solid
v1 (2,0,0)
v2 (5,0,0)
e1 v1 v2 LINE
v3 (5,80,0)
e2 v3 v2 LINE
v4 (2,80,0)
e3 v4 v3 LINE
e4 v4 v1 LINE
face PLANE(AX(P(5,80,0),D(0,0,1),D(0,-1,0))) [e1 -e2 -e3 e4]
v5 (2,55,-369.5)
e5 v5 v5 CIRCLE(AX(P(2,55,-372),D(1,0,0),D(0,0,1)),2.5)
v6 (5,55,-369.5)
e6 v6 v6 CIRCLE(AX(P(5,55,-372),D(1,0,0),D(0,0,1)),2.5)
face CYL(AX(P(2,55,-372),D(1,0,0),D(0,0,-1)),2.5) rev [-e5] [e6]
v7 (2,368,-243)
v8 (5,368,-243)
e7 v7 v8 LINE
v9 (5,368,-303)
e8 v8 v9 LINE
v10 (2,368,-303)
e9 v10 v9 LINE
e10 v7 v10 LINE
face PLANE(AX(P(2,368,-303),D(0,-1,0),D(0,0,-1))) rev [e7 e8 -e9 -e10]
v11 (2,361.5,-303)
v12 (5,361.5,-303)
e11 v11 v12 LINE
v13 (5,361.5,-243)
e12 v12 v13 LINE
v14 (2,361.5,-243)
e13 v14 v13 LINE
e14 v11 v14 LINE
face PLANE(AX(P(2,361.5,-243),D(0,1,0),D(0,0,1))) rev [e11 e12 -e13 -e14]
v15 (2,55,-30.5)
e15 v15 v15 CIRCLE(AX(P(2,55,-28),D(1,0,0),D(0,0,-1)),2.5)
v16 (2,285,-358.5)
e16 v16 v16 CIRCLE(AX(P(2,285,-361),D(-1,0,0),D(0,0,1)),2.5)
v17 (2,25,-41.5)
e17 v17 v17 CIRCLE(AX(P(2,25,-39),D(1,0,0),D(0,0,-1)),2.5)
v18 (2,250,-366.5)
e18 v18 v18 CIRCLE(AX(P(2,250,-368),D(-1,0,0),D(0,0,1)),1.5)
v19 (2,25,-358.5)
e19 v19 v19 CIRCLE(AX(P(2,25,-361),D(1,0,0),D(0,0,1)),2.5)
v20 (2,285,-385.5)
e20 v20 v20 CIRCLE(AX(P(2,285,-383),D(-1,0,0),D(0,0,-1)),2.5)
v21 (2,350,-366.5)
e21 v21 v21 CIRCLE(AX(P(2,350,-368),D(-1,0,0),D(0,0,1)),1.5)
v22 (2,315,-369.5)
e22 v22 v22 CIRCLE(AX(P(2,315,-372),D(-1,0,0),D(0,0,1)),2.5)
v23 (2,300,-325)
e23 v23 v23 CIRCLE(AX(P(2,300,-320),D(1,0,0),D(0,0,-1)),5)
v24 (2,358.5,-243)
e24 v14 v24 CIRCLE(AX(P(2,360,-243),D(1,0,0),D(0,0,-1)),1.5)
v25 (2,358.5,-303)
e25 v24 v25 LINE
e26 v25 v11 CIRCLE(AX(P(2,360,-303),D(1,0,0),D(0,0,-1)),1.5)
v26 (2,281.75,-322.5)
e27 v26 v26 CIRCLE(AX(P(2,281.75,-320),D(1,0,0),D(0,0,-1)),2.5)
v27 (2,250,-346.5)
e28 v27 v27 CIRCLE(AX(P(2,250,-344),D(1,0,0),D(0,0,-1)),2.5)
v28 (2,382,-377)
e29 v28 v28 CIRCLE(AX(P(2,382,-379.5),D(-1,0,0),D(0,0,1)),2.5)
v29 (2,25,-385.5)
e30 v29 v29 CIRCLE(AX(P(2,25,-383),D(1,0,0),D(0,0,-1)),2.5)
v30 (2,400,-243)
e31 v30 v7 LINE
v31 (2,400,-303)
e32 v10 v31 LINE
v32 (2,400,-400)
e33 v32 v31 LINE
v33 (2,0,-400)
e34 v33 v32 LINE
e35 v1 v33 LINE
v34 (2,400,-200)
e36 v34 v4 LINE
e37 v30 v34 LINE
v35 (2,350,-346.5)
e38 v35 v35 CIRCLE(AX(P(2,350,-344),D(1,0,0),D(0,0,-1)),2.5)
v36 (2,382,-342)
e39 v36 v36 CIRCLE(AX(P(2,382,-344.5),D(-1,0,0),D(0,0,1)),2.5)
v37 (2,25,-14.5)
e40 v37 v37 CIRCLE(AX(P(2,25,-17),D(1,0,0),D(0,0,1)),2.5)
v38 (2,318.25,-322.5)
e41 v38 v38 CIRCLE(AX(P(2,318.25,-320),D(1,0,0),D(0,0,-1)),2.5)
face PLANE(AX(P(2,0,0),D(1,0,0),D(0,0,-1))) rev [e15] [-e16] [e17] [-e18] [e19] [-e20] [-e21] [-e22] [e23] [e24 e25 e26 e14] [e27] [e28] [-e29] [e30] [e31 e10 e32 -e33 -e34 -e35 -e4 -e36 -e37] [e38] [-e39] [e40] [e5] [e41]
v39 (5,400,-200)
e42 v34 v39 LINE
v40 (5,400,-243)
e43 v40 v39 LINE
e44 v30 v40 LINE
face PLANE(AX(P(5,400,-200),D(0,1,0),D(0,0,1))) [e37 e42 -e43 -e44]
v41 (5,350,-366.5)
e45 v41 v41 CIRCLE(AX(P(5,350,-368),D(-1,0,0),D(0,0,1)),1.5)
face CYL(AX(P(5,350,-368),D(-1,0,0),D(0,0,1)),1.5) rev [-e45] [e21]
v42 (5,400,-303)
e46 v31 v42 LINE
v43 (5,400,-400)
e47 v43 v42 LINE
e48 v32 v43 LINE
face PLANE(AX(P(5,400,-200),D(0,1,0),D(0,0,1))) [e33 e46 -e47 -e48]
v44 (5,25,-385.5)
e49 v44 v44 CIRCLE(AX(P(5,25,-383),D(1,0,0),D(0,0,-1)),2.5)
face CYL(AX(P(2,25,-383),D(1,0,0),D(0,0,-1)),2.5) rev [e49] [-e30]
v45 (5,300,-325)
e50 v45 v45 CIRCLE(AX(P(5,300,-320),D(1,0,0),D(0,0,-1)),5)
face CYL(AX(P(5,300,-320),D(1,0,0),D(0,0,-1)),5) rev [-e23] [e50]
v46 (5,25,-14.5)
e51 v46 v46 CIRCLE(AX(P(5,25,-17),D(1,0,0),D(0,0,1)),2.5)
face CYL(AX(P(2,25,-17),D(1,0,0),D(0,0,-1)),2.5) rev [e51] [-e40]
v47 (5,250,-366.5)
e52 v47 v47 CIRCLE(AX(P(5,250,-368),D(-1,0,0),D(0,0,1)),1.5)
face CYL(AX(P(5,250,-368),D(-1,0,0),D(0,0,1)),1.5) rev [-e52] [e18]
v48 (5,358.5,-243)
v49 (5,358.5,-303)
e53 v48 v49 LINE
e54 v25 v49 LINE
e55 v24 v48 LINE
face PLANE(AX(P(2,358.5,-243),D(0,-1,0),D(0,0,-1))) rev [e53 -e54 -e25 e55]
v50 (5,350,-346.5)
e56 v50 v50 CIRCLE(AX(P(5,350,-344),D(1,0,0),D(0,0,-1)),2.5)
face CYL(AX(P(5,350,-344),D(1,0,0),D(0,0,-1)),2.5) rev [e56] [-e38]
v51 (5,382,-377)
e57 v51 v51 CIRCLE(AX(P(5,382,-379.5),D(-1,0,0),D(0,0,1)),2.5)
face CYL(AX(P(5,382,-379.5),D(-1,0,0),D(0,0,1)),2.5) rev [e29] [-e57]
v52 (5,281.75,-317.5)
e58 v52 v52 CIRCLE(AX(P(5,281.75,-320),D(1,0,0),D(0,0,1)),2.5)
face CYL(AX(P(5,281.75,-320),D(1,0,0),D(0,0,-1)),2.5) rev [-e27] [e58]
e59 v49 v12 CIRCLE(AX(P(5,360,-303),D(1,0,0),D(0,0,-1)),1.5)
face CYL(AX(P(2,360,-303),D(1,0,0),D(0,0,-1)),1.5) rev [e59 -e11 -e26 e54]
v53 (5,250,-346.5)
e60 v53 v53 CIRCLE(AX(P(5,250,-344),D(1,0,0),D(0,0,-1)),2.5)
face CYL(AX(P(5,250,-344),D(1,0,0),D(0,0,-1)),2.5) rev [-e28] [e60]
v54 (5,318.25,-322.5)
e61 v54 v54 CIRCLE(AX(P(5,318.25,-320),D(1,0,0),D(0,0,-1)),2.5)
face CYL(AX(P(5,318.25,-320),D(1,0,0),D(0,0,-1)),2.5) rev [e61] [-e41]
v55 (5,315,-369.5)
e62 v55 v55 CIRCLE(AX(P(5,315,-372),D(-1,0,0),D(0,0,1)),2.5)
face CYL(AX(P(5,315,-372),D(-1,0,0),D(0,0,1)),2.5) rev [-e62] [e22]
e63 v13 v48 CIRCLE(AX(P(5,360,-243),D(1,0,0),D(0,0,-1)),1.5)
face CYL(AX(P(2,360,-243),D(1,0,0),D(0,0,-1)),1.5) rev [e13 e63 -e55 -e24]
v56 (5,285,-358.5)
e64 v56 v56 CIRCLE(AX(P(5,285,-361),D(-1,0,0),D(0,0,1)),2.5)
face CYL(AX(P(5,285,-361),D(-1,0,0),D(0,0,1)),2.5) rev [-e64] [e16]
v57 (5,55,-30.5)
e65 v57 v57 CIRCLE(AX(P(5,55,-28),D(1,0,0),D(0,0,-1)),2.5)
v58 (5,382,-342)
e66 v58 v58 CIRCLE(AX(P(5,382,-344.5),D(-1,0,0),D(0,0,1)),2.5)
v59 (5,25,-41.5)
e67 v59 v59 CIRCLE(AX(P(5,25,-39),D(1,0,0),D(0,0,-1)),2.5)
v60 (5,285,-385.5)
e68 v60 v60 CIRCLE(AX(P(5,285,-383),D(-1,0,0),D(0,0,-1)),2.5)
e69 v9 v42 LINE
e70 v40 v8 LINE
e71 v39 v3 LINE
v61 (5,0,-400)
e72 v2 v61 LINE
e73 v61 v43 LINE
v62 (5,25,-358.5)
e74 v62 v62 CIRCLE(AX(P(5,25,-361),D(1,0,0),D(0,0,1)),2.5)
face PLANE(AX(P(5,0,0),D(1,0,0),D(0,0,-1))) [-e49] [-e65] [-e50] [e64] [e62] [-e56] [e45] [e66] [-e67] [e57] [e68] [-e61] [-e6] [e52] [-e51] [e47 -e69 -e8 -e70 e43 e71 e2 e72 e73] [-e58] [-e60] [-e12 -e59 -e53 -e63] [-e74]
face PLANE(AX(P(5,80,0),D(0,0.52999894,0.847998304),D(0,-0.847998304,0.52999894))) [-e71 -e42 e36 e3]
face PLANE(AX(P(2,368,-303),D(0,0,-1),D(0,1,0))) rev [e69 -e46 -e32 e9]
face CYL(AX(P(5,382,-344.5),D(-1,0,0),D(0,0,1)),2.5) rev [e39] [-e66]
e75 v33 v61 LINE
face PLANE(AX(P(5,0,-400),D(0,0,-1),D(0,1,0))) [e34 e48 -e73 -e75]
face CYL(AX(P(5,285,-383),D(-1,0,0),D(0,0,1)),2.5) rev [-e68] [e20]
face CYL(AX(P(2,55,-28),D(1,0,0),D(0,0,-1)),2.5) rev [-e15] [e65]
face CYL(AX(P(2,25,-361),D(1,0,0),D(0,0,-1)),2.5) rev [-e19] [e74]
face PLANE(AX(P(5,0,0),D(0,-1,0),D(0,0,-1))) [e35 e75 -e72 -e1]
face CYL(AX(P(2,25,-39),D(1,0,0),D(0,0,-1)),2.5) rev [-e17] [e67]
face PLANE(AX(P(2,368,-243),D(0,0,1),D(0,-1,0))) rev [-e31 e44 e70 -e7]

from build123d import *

# Parameters (mm, degrees)
SKETCH1_R                  = 2.5
SKETCH1_R_2                = 5
BOSS_EXTRUDE1_DEPTH        = 5
CONVERT_SOLID1_OUTLINE_R   = 2.5
CONVERT_SOLID1_OUTLINE_R_2 = 5
CONVERT_SOLID1_DEPTH       = 2
SKETCH6_R                  = 2.5
CUT_EXTRUDE1_DEPTH         = 10
SKETCH7_R                  = 2.5
CUT_EXTRUDE2_DEPTH         = 10
SKETCH8_R                  = 2.5
CUT_EXTRUDE3_DEPTH         = 10
SKETCH9_R                  = 1.5
CUT_EXTRUDE4_DEPTH         = 10
SKETCH10_W                 = 60
SKETCH10_H                 = 32
CUT_EXTRUDE5_DEPTH         = 10


# Read off the part's stored shape, not the designer's step: Convert-Solid1
with BuildPart() as part:
    # Sketch1 → Boss-Extrude1 (new body)
    with BuildSketch(Plane(origin=(0, 0, 0), x_dir=(0, 0, -1), z_dir=(1, 0, 0))):
        Polygon((0, 0), (400, 0), (400, 400), (200, 400), (0, 80), align=None)
        with Locations((344, 350)):
            Circle(SKETCH1_R, mode=Mode.SUBTRACT)
        with Locations((344, 250)):
            Circle(SKETCH1_R, mode=Mode.SUBTRACT)
        with Locations((320, 300)):
            Circle(SKETCH1_R_2, mode=Mode.SUBTRACT)
        with Locations((320, 318.25)):
            Circle(SKETCH1_R, mode=Mode.SUBTRACT)
        with Locations(Location((320, 281.75, 0), (0, 0, 180))):
            Circle(SKETCH1_R, mode=Mode.SUBTRACT)
    extrude(amount=BOSS_EXTRUDE1_DEPTH)

    # Convert-Solid1 outline → Convert-Solid1 (cut)
    with BuildSketch(Plane.YZ):
        Polygon((80, 0), (0, 0), (0, -400), (400, -400), (400, -200), align=None)
        with Locations((250, -344)):
            Circle(CONVERT_SOLID1_OUTLINE_R, mode=Mode.SUBTRACT)
        with Locations((281.75, -320)):
            Circle(CONVERT_SOLID1_OUTLINE_R, mode=Mode.SUBTRACT)
        with Locations((300, -320)):
            Circle(CONVERT_SOLID1_OUTLINE_R_2, mode=Mode.SUBTRACT)
        with Locations((350, -344)):
            Circle(CONVERT_SOLID1_OUTLINE_R, mode=Mode.SUBTRACT)
        with Locations((318.25, -320)):
            Circle(CONVERT_SOLID1_OUTLINE_R, mode=Mode.SUBTRACT)
    extrude(amount=CONVERT_SOLID1_DEPTH, mode=Mode.SUBTRACT)

    # Sketch6 → Cut-Extrude1 (cut)
    with BuildSketch(Plane(origin=(5, 0, 0), x_dir=(0, 0, -1), z_dir=(1, 0, 0))):
        with Locations((28, 55)):
            Circle(SKETCH6_R)
        with Locations((39, 25)):
            Circle(SKETCH6_R)
        with Locations(Location((17, 25, 0), (0, 0, 180))):
            Circle(SKETCH6_R)
        with Locations((383, 25)):
            Circle(SKETCH6_R)
        with Locations(Location((361, 25, 0), (0, 0, 180))):
            Circle(SKETCH6_R)
        with Locations(Location((372, 55, 0), (0, 0, 180))):
            Circle(SKETCH6_R)
    extrude(amount=-CUT_EXTRUDE1_DEPTH, mode=Mode.SUBTRACT)

    # Sketch7 → Cut-Extrude2 (cut)
    with BuildSketch(Plane.ZY.offset(-2)):
        with Locations((-372, 315)):
            Circle(SKETCH7_R)
        with Locations((-361, 285)):
            Circle(SKETCH7_R)
        with Locations(Location((-383, 285, 0), (0, 0, 180))):
            Circle(SKETCH7_R)
    extrude(amount=-CUT_EXTRUDE2_DEPTH, mode=Mode.SUBTRACT)

    # Sketch8 → Cut-Extrude3 (cut)
    with BuildSketch(Plane.ZY.offset(-2)):
        with Locations((-344.5, 382)):
            Circle(SKETCH8_R)
        with Locations((-379.5, 382)):
            Circle(SKETCH8_R)
    extrude(amount=-CUT_EXTRUDE3_DEPTH, mode=Mode.SUBTRACT)

    # Sketch9 → Cut-Extrude4 (cut)
    with BuildSketch(Plane.ZY.offset(-2)):
        with Locations((-368, 350)):
            Circle(SKETCH9_R)
        with Locations((-368, 250)):
            Circle(SKETCH9_R)
    extrude(amount=-CUT_EXTRUDE4_DEPTH, mode=Mode.SUBTRACT)

    # Sketch10 → Cut-Extrude5 (cut)
    with BuildSketch(Plane(origin=(5, 0, 0), x_dir=(0, 0, -1), z_dir=(1, 0, 0))):
        with Locations((273, 384)):
            Rectangle(SKETCH10_W, SKETCH10_H)
        with BuildLine():
            Line((243, 361.5), (303, 361.5))
            ThreePointArc((303, 361.5), (304.5, 360), (303, 358.5))
            Line((303, 358.5), (243, 358.5))
            ThreePointArc((243, 358.5), (241.5, 360), (243, 361.5))
        make_face()
    extrude(amount=-CUT_EXTRUDE5_DEPTH, mode=Mode.SUBTRACT)


solid = part.part
